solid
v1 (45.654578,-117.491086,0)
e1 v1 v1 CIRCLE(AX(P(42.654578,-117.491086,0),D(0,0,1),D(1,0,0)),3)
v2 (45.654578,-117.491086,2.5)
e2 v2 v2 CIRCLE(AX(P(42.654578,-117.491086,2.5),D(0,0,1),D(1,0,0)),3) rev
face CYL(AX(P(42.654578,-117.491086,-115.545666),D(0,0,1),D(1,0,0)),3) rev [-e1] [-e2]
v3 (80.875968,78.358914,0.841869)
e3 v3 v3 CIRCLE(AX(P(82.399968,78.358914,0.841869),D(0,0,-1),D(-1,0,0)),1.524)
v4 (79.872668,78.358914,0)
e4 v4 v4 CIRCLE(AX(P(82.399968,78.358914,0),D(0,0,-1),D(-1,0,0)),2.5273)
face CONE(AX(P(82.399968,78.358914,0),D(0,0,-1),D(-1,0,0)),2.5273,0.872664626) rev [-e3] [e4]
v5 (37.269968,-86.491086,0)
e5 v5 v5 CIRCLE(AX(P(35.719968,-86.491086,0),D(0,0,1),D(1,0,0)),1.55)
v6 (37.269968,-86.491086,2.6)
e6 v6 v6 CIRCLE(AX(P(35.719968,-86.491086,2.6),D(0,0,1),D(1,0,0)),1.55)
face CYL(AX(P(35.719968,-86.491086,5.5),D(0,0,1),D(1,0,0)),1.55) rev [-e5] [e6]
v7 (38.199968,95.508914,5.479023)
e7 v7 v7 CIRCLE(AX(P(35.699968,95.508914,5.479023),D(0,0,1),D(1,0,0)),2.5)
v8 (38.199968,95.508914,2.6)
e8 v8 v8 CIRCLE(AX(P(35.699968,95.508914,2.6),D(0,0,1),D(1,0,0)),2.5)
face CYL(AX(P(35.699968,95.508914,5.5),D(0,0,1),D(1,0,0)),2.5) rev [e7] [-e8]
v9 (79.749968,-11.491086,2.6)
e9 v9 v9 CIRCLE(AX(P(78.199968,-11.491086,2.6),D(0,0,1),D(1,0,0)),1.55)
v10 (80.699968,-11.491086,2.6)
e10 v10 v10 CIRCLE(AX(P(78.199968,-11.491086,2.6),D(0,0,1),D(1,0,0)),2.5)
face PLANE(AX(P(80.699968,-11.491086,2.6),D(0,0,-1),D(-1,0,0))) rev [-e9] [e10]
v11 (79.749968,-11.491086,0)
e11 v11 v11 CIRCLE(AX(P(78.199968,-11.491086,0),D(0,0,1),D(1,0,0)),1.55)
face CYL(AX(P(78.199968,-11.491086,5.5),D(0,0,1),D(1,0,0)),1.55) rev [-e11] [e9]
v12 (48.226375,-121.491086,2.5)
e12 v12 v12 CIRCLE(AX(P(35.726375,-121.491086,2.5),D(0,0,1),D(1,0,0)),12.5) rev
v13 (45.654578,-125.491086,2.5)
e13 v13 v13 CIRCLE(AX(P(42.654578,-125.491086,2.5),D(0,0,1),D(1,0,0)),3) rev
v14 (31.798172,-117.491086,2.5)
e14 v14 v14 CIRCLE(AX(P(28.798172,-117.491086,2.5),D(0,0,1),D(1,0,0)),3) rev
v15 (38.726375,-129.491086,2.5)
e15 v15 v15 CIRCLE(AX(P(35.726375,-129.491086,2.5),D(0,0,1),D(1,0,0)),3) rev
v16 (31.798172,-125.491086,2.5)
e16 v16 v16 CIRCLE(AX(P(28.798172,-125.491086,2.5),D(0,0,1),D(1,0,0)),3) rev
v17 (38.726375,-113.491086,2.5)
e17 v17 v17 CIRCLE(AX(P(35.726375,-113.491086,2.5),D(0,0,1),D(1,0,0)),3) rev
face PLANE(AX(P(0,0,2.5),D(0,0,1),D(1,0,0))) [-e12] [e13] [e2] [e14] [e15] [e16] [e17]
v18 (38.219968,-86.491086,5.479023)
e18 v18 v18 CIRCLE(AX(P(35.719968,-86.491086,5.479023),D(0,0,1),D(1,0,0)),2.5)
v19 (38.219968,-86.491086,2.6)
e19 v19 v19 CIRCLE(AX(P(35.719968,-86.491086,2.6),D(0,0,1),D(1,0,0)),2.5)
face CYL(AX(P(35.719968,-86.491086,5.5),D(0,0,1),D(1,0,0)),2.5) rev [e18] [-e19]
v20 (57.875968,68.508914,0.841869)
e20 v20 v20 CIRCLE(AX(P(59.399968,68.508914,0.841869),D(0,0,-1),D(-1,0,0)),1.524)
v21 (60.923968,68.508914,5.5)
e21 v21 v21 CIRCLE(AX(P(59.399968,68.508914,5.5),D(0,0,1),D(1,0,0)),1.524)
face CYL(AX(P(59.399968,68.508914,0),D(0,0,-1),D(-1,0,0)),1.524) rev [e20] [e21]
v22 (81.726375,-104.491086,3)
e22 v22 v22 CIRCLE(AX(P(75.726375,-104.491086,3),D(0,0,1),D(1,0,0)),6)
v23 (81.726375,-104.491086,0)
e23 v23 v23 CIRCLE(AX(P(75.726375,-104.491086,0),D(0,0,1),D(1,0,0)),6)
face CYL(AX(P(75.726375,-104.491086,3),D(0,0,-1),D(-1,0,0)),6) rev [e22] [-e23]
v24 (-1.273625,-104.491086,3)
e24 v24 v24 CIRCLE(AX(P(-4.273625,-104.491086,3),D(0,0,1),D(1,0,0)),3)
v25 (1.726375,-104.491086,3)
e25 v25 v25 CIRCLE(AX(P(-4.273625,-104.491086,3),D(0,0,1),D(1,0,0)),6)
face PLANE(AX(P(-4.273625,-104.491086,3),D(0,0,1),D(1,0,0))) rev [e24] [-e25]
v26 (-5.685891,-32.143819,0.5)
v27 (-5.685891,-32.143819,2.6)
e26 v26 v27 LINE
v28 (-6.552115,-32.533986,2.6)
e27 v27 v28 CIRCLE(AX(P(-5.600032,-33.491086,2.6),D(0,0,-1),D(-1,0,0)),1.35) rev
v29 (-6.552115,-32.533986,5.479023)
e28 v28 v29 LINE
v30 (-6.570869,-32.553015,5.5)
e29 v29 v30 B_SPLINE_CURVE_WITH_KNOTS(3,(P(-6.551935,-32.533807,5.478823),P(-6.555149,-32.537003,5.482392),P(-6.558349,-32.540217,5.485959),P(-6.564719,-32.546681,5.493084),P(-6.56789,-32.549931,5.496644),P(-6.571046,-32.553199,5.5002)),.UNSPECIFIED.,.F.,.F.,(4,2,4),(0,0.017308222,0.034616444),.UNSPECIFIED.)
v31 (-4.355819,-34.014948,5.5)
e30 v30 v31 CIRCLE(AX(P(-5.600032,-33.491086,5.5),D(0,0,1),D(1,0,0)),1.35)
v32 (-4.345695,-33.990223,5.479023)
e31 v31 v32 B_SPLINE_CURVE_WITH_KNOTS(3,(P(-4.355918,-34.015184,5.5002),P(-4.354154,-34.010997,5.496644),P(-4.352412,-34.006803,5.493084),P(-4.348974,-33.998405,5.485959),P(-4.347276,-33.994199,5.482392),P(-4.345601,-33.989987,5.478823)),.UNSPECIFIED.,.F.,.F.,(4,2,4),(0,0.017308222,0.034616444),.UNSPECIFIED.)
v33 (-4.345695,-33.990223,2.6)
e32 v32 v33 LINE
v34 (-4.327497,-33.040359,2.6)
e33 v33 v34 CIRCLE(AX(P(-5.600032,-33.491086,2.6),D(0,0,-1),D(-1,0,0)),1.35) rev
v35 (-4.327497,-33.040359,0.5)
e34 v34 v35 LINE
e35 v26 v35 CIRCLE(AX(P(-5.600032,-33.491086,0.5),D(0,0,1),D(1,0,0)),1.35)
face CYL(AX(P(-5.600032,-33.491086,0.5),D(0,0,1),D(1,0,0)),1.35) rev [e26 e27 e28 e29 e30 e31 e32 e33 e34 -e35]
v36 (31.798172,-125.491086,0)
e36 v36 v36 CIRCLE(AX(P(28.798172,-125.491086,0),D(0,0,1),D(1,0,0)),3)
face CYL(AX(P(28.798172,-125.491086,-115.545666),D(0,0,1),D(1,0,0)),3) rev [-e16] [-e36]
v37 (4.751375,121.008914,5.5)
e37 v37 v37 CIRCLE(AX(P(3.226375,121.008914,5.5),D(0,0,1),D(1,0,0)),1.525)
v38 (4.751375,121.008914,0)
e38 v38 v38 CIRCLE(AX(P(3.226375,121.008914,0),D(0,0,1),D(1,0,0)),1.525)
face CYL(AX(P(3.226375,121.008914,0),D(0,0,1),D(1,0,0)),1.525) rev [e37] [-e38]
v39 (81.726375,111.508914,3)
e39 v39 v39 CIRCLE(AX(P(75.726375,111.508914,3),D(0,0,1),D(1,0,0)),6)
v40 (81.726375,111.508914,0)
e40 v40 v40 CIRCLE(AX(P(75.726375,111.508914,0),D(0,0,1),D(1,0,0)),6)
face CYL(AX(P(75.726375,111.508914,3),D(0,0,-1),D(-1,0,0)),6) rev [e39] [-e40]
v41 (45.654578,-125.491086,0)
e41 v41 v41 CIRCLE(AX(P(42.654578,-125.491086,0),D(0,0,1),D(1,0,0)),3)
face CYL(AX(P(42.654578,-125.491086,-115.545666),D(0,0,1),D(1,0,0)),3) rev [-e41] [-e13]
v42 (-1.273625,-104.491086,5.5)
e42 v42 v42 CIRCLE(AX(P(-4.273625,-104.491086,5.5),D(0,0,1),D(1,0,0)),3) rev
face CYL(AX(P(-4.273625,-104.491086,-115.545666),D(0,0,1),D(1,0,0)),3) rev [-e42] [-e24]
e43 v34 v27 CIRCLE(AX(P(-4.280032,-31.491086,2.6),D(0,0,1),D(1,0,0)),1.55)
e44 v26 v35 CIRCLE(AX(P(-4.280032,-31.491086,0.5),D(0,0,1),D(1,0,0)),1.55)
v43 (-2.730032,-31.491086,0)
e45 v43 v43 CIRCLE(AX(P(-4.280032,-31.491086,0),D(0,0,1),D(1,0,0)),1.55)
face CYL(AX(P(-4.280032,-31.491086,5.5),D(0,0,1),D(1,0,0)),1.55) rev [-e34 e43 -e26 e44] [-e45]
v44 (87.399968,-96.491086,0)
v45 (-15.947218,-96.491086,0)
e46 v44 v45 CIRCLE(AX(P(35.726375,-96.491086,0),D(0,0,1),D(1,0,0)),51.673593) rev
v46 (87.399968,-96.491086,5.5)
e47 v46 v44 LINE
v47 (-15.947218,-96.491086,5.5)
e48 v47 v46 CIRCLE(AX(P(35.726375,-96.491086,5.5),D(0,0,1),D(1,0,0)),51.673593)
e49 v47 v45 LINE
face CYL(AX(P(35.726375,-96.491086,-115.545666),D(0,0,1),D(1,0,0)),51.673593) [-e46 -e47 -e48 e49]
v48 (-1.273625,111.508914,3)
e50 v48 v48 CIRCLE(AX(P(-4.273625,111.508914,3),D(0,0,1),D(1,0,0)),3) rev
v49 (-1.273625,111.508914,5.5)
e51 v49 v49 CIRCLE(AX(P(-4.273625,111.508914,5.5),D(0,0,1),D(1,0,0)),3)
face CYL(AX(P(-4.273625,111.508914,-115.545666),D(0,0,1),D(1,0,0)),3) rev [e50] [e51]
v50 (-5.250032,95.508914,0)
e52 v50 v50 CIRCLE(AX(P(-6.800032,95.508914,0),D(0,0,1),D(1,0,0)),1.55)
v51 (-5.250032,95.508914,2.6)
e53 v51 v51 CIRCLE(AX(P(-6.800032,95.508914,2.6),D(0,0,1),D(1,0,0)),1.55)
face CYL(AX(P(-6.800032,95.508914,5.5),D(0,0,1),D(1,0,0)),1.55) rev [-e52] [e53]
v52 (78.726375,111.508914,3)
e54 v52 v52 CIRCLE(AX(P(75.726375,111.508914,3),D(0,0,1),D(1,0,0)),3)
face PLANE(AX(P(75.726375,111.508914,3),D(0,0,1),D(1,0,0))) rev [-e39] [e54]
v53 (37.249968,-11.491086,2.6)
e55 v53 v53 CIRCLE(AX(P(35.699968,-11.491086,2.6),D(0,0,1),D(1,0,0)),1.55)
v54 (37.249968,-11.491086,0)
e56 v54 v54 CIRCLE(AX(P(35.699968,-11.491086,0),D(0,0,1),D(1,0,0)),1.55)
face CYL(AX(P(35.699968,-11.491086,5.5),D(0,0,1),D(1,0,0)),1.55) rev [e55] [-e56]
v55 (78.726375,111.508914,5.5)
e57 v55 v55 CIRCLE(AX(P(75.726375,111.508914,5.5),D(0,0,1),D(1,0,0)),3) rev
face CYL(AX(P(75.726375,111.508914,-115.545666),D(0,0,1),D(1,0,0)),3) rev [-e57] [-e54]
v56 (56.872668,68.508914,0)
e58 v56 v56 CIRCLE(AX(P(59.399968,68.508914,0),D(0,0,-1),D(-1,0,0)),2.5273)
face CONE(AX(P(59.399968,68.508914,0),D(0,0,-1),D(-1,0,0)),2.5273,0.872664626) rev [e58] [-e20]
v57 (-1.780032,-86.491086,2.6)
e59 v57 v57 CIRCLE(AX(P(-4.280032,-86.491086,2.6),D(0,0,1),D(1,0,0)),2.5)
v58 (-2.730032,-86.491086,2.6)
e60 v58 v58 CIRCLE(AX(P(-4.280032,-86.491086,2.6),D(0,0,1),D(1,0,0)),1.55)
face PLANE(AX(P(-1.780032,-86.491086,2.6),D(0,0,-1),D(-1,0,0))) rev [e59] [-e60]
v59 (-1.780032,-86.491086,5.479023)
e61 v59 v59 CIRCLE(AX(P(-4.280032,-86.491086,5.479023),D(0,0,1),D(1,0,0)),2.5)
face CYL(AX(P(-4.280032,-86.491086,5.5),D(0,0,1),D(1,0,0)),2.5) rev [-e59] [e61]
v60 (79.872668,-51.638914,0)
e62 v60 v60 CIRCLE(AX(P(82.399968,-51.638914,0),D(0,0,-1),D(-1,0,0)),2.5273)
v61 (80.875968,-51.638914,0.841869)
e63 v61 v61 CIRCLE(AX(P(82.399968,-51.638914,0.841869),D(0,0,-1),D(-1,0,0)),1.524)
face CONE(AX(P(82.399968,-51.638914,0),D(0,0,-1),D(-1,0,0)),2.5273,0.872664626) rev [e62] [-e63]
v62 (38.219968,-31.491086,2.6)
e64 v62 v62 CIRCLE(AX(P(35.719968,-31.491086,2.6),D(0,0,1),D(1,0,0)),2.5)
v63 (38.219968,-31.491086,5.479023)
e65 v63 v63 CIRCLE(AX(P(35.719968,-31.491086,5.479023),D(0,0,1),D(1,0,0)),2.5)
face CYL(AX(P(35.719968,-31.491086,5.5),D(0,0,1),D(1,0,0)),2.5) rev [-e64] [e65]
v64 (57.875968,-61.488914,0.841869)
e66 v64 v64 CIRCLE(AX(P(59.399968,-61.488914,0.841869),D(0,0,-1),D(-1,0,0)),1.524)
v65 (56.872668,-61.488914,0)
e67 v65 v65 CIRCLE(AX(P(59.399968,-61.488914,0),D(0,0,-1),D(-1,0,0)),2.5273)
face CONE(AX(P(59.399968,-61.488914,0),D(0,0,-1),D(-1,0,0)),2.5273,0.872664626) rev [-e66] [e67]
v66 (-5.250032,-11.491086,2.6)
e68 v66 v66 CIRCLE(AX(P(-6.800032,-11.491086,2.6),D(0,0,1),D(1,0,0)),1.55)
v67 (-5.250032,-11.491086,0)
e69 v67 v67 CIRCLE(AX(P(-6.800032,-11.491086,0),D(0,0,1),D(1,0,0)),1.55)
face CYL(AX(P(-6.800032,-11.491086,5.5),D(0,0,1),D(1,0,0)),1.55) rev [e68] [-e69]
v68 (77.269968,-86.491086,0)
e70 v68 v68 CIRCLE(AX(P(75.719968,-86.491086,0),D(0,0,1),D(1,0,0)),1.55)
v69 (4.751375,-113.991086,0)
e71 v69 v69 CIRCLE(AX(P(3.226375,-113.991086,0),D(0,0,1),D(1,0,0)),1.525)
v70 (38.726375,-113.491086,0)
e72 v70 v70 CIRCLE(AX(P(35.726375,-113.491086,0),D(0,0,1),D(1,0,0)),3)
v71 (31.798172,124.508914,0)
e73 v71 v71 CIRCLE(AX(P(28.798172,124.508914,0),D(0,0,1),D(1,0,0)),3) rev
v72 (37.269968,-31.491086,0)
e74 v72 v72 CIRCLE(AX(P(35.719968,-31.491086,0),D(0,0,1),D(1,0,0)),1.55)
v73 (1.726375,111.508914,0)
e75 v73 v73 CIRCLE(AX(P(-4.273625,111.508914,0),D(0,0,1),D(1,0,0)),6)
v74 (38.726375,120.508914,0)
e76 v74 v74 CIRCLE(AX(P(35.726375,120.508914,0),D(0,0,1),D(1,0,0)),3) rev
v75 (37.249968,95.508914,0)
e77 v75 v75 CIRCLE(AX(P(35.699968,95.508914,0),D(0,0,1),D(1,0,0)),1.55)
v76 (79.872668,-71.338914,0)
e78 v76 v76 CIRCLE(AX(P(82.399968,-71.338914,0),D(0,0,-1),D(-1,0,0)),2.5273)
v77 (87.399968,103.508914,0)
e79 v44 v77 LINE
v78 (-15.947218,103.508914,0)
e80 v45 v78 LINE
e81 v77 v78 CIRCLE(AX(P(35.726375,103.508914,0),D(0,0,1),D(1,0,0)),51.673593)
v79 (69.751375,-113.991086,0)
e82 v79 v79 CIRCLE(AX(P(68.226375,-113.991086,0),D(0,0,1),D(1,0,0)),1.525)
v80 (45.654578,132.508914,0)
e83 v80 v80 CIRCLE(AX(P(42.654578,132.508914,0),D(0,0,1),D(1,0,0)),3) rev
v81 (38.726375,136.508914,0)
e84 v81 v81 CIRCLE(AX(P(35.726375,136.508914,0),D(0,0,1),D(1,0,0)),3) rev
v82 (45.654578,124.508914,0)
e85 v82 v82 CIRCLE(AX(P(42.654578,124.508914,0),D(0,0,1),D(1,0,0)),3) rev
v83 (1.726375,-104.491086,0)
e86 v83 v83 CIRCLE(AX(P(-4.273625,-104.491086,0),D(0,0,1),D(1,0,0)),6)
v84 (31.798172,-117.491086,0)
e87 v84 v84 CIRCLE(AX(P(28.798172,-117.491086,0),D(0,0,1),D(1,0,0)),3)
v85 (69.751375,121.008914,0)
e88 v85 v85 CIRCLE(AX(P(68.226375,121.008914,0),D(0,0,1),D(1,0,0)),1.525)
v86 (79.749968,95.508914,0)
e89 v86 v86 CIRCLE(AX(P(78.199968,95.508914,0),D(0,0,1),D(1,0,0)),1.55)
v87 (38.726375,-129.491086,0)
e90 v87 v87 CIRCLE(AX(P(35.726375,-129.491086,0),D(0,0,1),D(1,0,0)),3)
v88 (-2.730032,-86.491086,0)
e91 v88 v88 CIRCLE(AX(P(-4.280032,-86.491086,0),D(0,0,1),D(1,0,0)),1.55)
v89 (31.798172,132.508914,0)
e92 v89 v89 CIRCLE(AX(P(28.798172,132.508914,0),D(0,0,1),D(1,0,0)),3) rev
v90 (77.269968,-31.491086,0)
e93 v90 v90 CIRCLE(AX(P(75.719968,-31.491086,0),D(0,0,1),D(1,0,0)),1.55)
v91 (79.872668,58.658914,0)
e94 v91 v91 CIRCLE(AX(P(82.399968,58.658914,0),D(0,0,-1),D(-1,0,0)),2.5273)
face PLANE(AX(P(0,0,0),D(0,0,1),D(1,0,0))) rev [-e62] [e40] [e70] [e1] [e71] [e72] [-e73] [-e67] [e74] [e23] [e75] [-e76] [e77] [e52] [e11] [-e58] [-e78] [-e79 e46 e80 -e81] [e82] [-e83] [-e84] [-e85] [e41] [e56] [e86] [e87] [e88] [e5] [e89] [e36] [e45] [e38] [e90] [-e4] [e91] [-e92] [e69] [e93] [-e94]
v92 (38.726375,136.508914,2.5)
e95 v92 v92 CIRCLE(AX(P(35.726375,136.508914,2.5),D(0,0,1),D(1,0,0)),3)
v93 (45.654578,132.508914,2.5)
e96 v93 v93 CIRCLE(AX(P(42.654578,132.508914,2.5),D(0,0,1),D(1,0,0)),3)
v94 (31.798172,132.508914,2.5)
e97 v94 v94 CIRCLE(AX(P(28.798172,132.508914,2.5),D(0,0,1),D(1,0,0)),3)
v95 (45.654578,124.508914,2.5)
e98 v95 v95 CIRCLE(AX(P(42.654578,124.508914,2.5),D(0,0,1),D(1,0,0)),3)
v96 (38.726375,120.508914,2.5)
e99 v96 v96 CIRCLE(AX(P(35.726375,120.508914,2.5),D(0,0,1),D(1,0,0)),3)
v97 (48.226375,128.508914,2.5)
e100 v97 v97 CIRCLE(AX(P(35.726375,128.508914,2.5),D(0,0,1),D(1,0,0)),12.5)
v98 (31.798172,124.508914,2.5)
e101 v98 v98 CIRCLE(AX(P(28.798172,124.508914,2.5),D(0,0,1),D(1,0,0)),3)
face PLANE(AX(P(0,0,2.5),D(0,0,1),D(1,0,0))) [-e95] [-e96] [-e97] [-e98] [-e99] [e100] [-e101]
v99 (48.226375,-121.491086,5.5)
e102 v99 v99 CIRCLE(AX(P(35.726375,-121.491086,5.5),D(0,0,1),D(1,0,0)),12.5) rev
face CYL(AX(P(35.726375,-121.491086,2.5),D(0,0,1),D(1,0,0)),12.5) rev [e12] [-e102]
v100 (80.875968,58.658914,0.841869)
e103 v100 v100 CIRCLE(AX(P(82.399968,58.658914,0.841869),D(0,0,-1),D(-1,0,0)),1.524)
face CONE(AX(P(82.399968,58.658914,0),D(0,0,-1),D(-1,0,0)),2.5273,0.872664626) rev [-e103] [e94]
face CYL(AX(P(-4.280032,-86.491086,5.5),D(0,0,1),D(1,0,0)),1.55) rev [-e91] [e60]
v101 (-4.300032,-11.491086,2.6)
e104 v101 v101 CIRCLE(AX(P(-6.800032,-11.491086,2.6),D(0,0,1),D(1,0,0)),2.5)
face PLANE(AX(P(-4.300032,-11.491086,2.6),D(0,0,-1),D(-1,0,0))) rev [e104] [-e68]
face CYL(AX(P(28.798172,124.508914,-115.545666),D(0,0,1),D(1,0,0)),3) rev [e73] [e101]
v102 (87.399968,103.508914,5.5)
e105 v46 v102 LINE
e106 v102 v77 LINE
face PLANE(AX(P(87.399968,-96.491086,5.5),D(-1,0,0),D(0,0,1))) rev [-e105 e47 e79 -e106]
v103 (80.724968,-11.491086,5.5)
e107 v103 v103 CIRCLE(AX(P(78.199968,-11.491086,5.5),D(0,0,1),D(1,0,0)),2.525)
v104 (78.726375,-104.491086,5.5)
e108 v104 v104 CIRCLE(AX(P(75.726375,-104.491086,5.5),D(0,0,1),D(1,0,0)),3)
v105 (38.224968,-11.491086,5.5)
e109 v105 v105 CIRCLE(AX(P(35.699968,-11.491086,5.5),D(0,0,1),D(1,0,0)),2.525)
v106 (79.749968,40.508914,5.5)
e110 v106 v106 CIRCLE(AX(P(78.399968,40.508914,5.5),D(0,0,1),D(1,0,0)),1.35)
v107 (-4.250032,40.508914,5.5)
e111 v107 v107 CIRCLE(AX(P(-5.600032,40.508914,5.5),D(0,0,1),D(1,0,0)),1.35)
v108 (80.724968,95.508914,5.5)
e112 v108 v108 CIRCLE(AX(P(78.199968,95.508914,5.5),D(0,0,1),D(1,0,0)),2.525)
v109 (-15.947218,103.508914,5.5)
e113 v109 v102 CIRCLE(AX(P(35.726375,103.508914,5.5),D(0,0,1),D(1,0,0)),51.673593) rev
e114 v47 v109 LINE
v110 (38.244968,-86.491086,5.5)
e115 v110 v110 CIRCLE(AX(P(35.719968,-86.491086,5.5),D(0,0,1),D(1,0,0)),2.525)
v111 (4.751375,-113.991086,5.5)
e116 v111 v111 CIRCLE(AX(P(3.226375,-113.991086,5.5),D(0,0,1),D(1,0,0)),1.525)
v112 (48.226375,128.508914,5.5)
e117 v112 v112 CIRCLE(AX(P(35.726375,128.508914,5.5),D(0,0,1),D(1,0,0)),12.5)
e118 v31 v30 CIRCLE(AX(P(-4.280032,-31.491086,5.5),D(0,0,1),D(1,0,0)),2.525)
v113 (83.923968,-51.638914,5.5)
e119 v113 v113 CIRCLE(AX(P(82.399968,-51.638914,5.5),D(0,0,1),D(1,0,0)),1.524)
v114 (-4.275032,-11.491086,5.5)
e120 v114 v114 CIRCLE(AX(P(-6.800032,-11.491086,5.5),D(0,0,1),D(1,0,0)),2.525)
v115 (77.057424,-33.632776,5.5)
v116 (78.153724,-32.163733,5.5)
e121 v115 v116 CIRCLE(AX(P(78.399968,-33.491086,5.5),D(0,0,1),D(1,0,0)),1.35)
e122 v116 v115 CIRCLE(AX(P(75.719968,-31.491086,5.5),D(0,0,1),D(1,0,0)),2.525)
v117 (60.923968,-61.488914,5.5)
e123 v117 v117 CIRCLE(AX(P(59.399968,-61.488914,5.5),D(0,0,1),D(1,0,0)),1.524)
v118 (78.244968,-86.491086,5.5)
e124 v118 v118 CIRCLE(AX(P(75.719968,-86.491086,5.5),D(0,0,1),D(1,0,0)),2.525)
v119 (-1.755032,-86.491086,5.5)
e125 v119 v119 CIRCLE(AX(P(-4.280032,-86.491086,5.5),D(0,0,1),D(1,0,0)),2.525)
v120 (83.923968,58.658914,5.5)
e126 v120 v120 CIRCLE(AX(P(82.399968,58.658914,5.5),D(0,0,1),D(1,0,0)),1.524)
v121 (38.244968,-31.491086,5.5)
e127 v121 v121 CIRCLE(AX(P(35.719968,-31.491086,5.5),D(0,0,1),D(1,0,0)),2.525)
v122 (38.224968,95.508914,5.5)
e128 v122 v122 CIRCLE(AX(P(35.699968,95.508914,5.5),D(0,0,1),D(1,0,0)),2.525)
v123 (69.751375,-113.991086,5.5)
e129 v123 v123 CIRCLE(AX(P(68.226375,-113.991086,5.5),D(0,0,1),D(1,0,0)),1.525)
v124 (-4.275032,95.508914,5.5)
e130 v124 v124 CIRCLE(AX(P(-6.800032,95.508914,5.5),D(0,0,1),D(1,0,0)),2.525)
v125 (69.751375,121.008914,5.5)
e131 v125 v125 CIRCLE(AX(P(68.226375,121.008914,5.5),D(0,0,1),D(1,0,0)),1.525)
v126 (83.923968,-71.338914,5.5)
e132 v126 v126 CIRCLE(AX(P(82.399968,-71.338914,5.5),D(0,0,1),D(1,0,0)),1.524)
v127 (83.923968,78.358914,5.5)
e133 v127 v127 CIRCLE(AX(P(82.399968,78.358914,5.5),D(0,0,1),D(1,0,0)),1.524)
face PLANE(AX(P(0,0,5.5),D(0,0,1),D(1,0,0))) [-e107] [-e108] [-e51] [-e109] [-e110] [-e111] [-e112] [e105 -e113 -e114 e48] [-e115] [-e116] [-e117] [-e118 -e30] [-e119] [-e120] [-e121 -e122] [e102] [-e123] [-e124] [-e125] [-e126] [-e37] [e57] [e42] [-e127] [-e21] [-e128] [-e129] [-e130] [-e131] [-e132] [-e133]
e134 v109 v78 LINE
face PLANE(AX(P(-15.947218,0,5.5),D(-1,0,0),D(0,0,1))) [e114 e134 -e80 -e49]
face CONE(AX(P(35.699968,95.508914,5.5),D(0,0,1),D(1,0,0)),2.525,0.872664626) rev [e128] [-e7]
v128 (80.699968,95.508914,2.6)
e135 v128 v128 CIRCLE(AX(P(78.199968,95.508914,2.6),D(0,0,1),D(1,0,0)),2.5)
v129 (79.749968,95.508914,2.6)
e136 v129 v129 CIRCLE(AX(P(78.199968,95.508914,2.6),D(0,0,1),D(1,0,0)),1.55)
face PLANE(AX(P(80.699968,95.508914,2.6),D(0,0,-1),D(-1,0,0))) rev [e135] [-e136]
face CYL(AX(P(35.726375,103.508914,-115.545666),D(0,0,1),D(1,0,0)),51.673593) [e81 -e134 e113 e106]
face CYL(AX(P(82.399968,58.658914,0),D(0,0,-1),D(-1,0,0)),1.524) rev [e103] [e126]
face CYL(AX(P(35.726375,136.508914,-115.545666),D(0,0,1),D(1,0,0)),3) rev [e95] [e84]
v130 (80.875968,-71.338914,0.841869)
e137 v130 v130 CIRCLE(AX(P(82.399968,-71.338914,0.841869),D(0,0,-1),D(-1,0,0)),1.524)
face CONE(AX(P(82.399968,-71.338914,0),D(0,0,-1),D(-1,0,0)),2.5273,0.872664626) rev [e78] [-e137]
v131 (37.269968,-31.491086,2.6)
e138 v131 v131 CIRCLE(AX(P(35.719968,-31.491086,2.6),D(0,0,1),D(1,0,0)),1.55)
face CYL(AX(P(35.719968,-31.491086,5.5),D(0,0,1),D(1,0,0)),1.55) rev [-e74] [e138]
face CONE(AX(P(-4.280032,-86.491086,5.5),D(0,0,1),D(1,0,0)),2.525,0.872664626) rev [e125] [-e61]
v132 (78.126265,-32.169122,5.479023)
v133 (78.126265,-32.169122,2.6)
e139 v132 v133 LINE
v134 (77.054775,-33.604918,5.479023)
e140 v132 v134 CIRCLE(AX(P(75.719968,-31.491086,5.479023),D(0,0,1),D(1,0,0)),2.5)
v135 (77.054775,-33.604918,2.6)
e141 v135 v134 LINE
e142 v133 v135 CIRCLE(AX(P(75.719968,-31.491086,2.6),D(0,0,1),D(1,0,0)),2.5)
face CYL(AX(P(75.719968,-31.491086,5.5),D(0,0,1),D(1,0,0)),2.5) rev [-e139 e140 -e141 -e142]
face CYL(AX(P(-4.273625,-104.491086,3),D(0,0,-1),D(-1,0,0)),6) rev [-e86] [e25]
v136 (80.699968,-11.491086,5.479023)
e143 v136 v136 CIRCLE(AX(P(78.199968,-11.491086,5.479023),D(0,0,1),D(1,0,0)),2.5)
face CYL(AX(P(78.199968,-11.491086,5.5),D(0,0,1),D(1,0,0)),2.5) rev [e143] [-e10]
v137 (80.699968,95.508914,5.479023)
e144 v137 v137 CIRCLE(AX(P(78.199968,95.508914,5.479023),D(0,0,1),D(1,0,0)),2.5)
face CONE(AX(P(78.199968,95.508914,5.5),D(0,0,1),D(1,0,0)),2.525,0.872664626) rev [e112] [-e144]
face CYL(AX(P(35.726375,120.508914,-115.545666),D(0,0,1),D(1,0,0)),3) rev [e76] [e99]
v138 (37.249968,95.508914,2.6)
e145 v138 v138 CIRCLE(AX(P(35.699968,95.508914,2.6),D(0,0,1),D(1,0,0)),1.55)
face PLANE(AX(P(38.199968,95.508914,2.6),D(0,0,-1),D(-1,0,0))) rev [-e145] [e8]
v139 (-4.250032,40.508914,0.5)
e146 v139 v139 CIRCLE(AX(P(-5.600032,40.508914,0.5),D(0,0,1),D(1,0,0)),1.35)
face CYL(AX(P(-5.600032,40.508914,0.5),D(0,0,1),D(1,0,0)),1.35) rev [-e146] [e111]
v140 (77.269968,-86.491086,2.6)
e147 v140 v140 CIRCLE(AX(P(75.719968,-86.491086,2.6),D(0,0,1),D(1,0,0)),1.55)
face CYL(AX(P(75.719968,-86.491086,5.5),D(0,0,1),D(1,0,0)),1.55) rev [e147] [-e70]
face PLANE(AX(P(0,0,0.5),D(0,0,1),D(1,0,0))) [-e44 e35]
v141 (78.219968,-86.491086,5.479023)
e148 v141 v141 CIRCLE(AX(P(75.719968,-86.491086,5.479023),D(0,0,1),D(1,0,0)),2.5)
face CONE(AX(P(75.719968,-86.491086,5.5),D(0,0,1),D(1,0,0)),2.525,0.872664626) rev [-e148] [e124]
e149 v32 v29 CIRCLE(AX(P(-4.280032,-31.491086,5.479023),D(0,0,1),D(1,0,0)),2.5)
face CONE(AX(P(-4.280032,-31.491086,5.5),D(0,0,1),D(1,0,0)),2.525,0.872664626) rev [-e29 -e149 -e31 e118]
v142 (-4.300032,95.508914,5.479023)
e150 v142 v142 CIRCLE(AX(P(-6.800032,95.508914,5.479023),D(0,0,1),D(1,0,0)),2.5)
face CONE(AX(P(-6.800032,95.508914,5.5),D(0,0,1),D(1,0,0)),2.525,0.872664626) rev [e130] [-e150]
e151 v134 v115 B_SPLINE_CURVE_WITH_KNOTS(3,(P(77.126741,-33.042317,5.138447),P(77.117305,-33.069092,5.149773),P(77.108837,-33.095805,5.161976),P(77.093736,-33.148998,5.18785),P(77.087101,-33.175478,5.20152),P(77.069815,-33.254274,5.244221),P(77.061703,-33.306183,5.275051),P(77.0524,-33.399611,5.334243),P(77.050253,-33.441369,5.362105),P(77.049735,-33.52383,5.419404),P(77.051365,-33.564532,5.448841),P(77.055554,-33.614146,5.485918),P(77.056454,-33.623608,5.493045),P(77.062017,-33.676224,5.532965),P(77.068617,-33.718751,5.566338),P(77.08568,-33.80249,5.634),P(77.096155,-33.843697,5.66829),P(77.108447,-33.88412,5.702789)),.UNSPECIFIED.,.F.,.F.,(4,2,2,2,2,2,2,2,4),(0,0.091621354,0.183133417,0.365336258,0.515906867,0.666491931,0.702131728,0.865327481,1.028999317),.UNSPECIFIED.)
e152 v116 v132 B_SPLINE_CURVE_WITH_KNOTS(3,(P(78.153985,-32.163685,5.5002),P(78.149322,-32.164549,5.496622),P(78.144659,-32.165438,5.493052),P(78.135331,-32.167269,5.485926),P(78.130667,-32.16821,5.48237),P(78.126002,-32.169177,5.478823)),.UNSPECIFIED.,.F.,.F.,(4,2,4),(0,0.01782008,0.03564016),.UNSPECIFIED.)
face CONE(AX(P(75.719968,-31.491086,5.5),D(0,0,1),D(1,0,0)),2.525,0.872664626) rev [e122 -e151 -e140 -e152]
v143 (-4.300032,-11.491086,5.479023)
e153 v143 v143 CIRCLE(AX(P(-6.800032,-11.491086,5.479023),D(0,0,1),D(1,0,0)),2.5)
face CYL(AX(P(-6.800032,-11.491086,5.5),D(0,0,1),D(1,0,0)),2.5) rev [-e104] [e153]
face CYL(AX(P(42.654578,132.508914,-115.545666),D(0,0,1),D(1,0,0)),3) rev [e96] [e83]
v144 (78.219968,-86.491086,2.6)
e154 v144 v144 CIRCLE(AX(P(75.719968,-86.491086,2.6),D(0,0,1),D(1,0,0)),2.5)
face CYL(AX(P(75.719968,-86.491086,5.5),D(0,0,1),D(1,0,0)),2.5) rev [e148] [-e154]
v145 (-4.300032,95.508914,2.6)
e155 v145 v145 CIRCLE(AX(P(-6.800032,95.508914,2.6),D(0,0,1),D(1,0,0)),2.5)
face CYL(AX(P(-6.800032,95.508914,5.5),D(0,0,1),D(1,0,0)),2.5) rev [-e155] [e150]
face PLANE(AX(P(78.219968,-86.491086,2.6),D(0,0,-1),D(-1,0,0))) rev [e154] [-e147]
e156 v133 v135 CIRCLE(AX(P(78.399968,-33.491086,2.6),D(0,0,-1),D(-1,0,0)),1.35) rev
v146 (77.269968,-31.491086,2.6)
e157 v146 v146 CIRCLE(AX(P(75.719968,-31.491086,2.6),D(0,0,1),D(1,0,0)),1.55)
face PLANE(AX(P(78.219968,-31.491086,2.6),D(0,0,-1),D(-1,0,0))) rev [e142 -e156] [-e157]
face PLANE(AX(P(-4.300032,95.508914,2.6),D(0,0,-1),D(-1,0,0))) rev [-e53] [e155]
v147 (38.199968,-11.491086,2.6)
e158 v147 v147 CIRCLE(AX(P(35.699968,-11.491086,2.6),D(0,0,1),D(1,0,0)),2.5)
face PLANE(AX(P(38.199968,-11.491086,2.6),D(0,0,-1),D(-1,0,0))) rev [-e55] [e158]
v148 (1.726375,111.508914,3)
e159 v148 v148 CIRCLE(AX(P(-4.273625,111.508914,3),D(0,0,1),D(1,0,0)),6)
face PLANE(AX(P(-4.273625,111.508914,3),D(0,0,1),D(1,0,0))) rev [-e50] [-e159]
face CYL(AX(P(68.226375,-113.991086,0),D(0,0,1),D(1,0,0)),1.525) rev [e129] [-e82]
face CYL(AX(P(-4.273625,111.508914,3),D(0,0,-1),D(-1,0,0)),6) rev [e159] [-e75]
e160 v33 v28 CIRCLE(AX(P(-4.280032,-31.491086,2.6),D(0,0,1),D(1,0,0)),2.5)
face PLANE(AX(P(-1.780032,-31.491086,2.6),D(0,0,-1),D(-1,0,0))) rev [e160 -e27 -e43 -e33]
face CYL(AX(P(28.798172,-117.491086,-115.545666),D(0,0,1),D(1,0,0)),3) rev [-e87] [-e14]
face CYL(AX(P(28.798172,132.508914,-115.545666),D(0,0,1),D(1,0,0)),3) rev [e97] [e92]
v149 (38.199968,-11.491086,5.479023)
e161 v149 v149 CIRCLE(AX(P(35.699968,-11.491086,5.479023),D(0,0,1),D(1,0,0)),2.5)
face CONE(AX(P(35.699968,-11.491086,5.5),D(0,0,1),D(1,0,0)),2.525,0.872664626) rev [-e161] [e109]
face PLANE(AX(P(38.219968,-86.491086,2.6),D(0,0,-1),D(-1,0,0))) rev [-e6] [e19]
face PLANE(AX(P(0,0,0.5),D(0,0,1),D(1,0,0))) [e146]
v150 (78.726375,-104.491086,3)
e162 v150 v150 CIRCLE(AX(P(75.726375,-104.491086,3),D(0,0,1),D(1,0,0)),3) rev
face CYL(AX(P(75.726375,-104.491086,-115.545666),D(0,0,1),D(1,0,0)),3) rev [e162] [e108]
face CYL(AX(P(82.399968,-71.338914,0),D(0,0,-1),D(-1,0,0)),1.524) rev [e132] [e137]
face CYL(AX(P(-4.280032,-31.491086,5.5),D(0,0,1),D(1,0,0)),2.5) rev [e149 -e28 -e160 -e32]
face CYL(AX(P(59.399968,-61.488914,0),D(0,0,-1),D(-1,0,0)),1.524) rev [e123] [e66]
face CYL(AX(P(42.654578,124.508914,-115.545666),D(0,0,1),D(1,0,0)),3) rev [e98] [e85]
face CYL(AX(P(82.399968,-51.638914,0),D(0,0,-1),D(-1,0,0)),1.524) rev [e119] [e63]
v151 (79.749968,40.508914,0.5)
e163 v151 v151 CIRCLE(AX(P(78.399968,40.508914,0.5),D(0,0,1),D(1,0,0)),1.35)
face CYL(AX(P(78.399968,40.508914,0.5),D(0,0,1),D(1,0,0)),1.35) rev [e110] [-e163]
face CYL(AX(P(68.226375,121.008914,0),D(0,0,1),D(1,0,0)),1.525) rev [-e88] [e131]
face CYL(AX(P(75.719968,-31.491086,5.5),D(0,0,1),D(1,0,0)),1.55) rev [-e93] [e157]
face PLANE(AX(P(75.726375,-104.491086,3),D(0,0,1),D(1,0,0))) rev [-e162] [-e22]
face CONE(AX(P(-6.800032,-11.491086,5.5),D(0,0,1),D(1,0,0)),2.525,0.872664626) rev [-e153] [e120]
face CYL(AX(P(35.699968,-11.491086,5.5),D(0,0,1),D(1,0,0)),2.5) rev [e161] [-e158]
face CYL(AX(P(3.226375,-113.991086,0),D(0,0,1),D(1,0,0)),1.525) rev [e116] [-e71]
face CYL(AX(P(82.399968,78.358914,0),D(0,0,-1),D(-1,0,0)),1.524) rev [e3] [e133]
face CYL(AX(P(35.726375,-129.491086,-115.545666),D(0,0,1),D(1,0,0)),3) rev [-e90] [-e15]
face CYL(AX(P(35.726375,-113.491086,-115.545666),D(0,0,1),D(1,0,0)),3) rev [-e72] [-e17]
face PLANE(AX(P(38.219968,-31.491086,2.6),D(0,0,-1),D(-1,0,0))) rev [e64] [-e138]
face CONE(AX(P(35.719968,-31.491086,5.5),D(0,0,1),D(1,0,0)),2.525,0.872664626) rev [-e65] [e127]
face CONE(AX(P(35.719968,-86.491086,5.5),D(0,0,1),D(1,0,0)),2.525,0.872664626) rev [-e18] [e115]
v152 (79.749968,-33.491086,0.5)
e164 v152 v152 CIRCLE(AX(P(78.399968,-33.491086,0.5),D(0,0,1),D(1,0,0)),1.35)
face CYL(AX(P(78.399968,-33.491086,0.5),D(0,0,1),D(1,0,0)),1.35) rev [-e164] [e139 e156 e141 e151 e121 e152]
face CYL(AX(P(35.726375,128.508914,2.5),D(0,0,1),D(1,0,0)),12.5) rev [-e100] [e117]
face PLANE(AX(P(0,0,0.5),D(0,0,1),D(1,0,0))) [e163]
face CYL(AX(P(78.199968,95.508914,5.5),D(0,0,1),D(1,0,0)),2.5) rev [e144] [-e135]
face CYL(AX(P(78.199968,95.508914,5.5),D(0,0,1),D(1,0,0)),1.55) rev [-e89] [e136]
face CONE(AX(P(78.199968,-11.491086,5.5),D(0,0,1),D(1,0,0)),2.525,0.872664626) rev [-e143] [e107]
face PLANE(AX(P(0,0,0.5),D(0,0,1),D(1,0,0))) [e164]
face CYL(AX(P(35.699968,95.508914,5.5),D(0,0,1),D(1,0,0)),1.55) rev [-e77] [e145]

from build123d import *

# Parameters (mm, degrees)
SKETCH_2_W                      = 103.347185053
SKETCH_2_H                      = 200
EXTRUDE_1_DEPTH                 = 5.5
EXTRUDE_START                   = -5.5
EXTRUDE_2_OUTLINE_R             = 3
EXTRUDE_2_DEPTH                 = 5.5
CUT_EXTRUDE_START               = -3
CUT_EXTRUDE_6_OUTLINE_R         = 12.5
CUT_EXTRUDE_6_OUTLINE_R_2       = 3
CUT_EXTRUDE_6_DEPTH             = 3
CUT_EXTRUDE3_START              = -5.5
CUT_EXTRUDE3_OUTLINE_R          = 6
CUT_EXTRUDE3_OUTLINE_R_2        = 3
CUT_EXTRUDE3_DEPTH              = 3
CUT_EXTRUDE_7_DEPTH             = 5
HOLE_WIZARD_3_100_2_D           = 3.048
HOLE_WIZARD_3_100_2_CSINK_D     = 5.0546
HOLE_WIZARD_3_100_2_CSINK_ANGLE = 100
HOLE_WIZARD_1_AT_2_COUNT        = 2
HOLE_WIZARD_1_AT_2_PITCH        = 42.5
HOLE_WIZARD_1_AT_3_COUNT        = 2
HOLE_WIZARD_1_AT_3_PITCH        = 85
HOLE_WIZARD_1_AT_4_COUNT        = 2
HOLE_WIZARD_1_AT_4_PITCH        = 107
HOLE_WIZARD_1_AT_5_COUNT        = 2
HOLE_WIZARD_1_AT_5_PITCH        = 115.131446616
HOLE_WIZARD_1_AT_6_COUNT        = 2
HOLE_WIZARD_1_AT_6_PITCH        = 136.65284483
HOLE_WIZARD_2_AT_2_COUNT        = 2
HOLE_WIZARD_2_AT_2_PITCH        = 40
HOLE_WIZARD_2_AT_3_COUNT        = 2
HOLE_WIZARD_2_AT_3_PITCH        = 55
HOLE_WIZARD_2_AT_4_COUNT        = 2
HOLE_WIZARD_2_AT_4_PITCH        = 68.007352544
HOLE_WIZARD_2_AT_5_COUNT        = 2
HOLE_WIZARD_2_AT_5_PITCH        = 97.082439195
HOLE_WIZARD_2_AT_6_COUNT        = 2
HOLE_WIZARD_2_AT_6_PITCH        = 80
SKETCH_15_R                     = 1.525
CUT_EXTRUDE_8_DEPTH             = 5.5


# Read off the part's stored shape, not the designer's step: 凸台-拉伸2, 切除-拉伸6, Cut-Extrude3
with BuildPart() as part:
    # 草图2 → 凸台-拉伸1 (new body)
    with BuildSketch(Plane.XY):
        with Locations((35.726375018, 3.508914385)):
            Rectangle(SKETCH_2_W, SKETCH_2_H)
    extrude(amount=EXTRUDE_1_DEPTH)

    # 凸台-拉伸2 outline → 凸台-拉伸2 (add)
    # profile 1 of 2: a face of its own
    with BuildSketch(Plane.XY.offset(5.5).offset(EXTRUDE_START)):
        with BuildLine():
            Line((-15.947217509, 103.508914385), (87.399967544, 103.508914385))
            ThreePointArc((87.399967544, 103.508914385), (35.726375017, 155.182506912), (-15.947217509, 103.508914385))
        make_face()
        with Locations((-4.273624983, 111.508914385)):
            Circle(EXTRUDE_2_OUTLINE_R, mode=Mode.SUBTRACT)
        with Locations((28.798171787, 124.508914385)):
            Circle(EXTRUDE_2_OUTLINE_R, mode=Mode.SUBTRACT)
        with Locations((28.798171787, 132.508914385)):
            Circle(EXTRUDE_2_OUTLINE_R, mode=Mode.SUBTRACT)
        with Locations((35.726375017, 120.508914385)):
            Circle(EXTRUDE_2_OUTLINE_R, mode=Mode.SUBTRACT)
        with Locations((35.726375017, 136.508914385)):
            Circle(EXTRUDE_2_OUTLINE_R, mode=Mode.SUBTRACT)
        with Locations((42.654578248, 124.508914385)):
            Circle(EXTRUDE_2_OUTLINE_R, mode=Mode.SUBTRACT)
        with Locations((42.654578248, 132.508914385)):
            Circle(EXTRUDE_2_OUTLINE_R, mode=Mode.SUBTRACT)
        with Locations((75.726375017, 111.508914385)):
            Circle(EXTRUDE_2_OUTLINE_R, mode=Mode.SUBTRACT)
    # profile 2 of 2: a face of its own
    with BuildSketch(Plane.XY.offset(5.5).offset(EXTRUDE_START)):
        with BuildLine():
            Line((87.399967544, -96.491085615), (-15.947217509, -96.491085615))
            ThreePointArc((-15.947217509, -96.491085615), (35.726375018, -148.164678141), (87.399967544, -96.491085615))
        make_face()
        with Locations((-4.273624983, -104.491085615)):
            Circle(EXTRUDE_2_OUTLINE_R, mode=Mode.SUBTRACT)
        with Locations((35.726375017, -129.491085615)):
            Circle(EXTRUDE_2_OUTLINE_R, mode=Mode.SUBTRACT)
        with Locations((28.798171787, -125.491085615)):
            Circle(EXTRUDE_2_OUTLINE_R, mode=Mode.SUBTRACT)
        with Locations((28.798171787, -117.491085615)):
            Circle(EXTRUDE_2_OUTLINE_R, mode=Mode.SUBTRACT)
        with Locations((35.726375017, -113.491085615)):
            Circle(EXTRUDE_2_OUTLINE_R, mode=Mode.SUBTRACT)
        with Locations((42.654578248, -125.491085615)):
            Circle(EXTRUDE_2_OUTLINE_R, mode=Mode.SUBTRACT)
        with Locations((42.654578248, -117.491085615)):
            Circle(EXTRUDE_2_OUTLINE_R, mode=Mode.SUBTRACT)
        with Locations((75.726375017, -104.491085615)):
            Circle(EXTRUDE_2_OUTLINE_R, mode=Mode.SUBTRACT)
    extrude(amount=EXTRUDE_2_DEPTH)

    # 切除-拉伸6 outline → 切除-拉伸6 (cut)
    # profile 1 of 2: a face of its own
    with BuildSketch(Plane.XY.offset(5.5).offset(CUT_EXTRUDE_START)):
        with Locations((35.726375017, -121.491085615)):
            Circle(CUT_EXTRUDE_6_OUTLINE_R)
        with Locations((28.798171787, -125.491085615)):
            Circle(CUT_EXTRUDE_6_OUTLINE_R_2, mode=Mode.SUBTRACT)
        with Locations((28.798171787, -117.491085615)):
            Circle(CUT_EXTRUDE_6_OUTLINE_R_2, mode=Mode.SUBTRACT)
        with Locations((35.726375017, -129.491085615)):
            Circle(CUT_EXTRUDE_6_OUTLINE_R_2, mode=Mode.SUBTRACT)
        with Locations((35.726375017, -113.491085615)):
            Circle(CUT_EXTRUDE_6_OUTLINE_R_2, mode=Mode.SUBTRACT)
        with Locations((42.654578248, -125.491085615)):
            Circle(CUT_EXTRUDE_6_OUTLINE_R_2, mode=Mode.SUBTRACT)
        with Locations((42.654578248, -117.491085615)):
            Circle(CUT_EXTRUDE_6_OUTLINE_R_2, mode=Mode.SUBTRACT)
    # profile 2 of 2: a face of its own
    with BuildSketch(Plane.XY.offset(5.5).offset(CUT_EXTRUDE_START)):
        with Locations((35.726375017, 128.508914385)):
            Circle(CUT_EXTRUDE_6_OUTLINE_R)
        with Locations((28.798171787, 124.508914385)):
            Circle(CUT_EXTRUDE_6_OUTLINE_R_2, mode=Mode.SUBTRACT)
        with Locations((28.798171787, 132.508914385)):
            Circle(CUT_EXTRUDE_6_OUTLINE_R_2, mode=Mode.SUBTRACT)
        with Locations((35.726375017, 120.508914385)):
            Circle(CUT_EXTRUDE_6_OUTLINE_R_2, mode=Mode.SUBTRACT)
        with Locations((35.726375017, 136.508914385)):
            Circle(CUT_EXTRUDE_6_OUTLINE_R_2, mode=Mode.SUBTRACT)
        with Locations((42.654578248, 124.508914385)):
            Circle(CUT_EXTRUDE_6_OUTLINE_R_2, mode=Mode.SUBTRACT)
        with Locations((42.654578248, 132.508914385)):
            Circle(CUT_EXTRUDE_6_OUTLINE_R_2, mode=Mode.SUBTRACT)
    extrude(amount=CUT_EXTRUDE_6_DEPTH, mode=Mode.SUBTRACT)

    # Cut-Extrude3 outline → Cut-Extrude3 (cut)
    # profile 1 of 4: a face of its own
    with BuildSketch(Plane.XY.offset(5.5).offset(CUT_EXTRUDE3_START)):
        with Locations((75.726375017, -104.491085615)):
            Circle(CUT_EXTRUDE3_OUTLINE_R)
        with Locations((75.726375017, -104.491085615)):
            Circle(CUT_EXTRUDE3_OUTLINE_R_2, mode=Mode.SUBTRACT)
    # profile 2 of 4: a face of its own
    with BuildSketch(Plane.XY.offset(5.5).offset(CUT_EXTRUDE3_START)):
        with Locations((-4.273624983, -104.491085615)):
            Circle(CUT_EXTRUDE3_OUTLINE_R)
        with Locations((-4.273624983, -104.491085615)):
            Circle(CUT_EXTRUDE3_OUTLINE_R_2, mode=Mode.SUBTRACT)
    # profile 3 of 4: a face of its own
    with BuildSketch(Plane.XY.offset(5.5).offset(CUT_EXTRUDE3_START)):
        with Locations((75.726375017, 111.508914385)):
            Circle(CUT_EXTRUDE3_OUTLINE_R)
        with Locations((75.726375017, 111.508914385)):
            Circle(CUT_EXTRUDE3_OUTLINE_R_2, mode=Mode.SUBTRACT)
    # profile 4 of 4: a face of its own
    with BuildSketch(Plane.XY.offset(5.5).offset(CUT_EXTRUDE3_START)):
        with Locations((-4.273624983, 111.508914385)):
            Circle(CUT_EXTRUDE3_OUTLINE_R)
        with Locations((-4.273624983, 111.508914385)):
            Circle(CUT_EXTRUDE3_OUTLINE_R_2, mode=Mode.SUBTRACT)
    extrude(amount=CUT_EXTRUDE3_DEPTH, mode=Mode.SUBTRACT)

    # 草图5 → 切除-拉伸7 (cut)
    with BuildSketch(Plane.XY.offset(5.5)):
        with BuildLine():
            ThreePointArc((79.749967544, 40.508914385), (78.399967544, 41.858914385), (77.049967544, 40.508914385))
            Line((77.049967544, 40.508914385), (78.399967544, 40.508914385))
            Line((78.399967544, 40.508914385), (78.399967544, 39.158914385))
            ThreePointArc((78.399967544, 39.158914385), (79.354561699, 39.554320231), (79.749967544, 40.508914385))
        make_face()
        with BuildLine():
            Line((78.399967544, 40.508914385), (77.049967544, 40.508914385))
            ThreePointArc((77.049967544, 40.508914385), (77.44537339, 39.554320231), (78.399967544, 39.158914385))
            Line((78.399967544, 39.158914385), (78.399967544, 40.508914385))
        make_face()
        with BuildLine():
            ThreePointArc((79.749967544, -33.491085615), (79.354561699, -32.53649146), (78.399967544, -32.141085615))
            Line((78.399967544, -32.141085615), (78.399967544, -33.491085615))
            Line((78.399967544, -33.491085615), (77.049967544, -33.491085615))
            ThreePointArc((77.049967544, -33.491085615), (78.399967544, -34.841085615), (79.749967544, -33.491085615))
        make_face()
        with BuildLine():
            Line((78.399967544, -33.491085615), (78.399967544, -32.141085615))
            ThreePointArc((78.399967544, -32.141085615), (77.44537339, -32.53649146), (77.049967544, -33.491085615))
            Line((77.049967544, -33.491085615), (78.399967544, -33.491085615))
        make_face()
        with BuildLine():
            ThreePointArc((-4.250032456, -33.491085615), (-4.645438301, -32.53649146), (-5.600032456, -32.141085615))
            Line((-5.600032456, -32.141085615), (-5.600032456, -33.491085615))
            Line((-5.600032456, -33.491085615), (-4.250032456, -33.491085615))
        make_face()
        with BuildLine():
            Line((-5.600032456, -33.491085615), (-5.600032456, -32.141085615))
            ThreePointArc((-5.600032456, -32.141085615), (-6.55462661, -34.445679769), (-4.250032456, -33.491085615))
            Line((-4.250032456, -33.491085615), (-5.600032456, -33.491085615))
        make_face()
        with BuildLine():
            Line((-5.600032456, 39.158914385), (-5.600032456, 40.508914385))
            Line((-5.600032456, 40.508914385), (-4.250032456, 40.508914385))
            ThreePointArc((-4.250032456, 40.508914385), (-6.55462661, 41.46350854), (-5.600032456, 39.158914385))
        make_face()
        with BuildLine():
            Line((-4.250032456, 40.508914385), (-5.600032456, 40.508914385))
            Line((-5.600032456, 40.508914385), (-5.600032456, 39.158914385))
            ThreePointArc((-5.600032456, 39.158914385), (-4.645438301, 39.554320231), (-4.250032456, 40.508914385))
        make_face()
    extrude(amount=-CUT_EXTRUDE_7_DEPTH, mode=Mode.SUBTRACT)

    # #3 平头机械螺钉的锥形沉头孔 (100)2 (through all)
    with Locations(Plane(origin=(0, 0, 0), x_dir=(-1, 0, 0), z_dir=(0, 0, -1))):
        with Locations((-82.399967544, 78.358914385), (-59.399967544, 68.508914385), (-82.399967544, 58.658914385)):
            hole_wizard_3_100_2 = CounterSinkHole(HOLE_WIZARD_3_100_2_D / 2, HOLE_WIZARD_3_100_2_CSINK_D / 2, counter_sink_angle=HOLE_WIZARD_3_100_2_CSINK_ANGLE)

    # 镜向1: #3 平头机械螺钉的锥形沉头孔 (100)2 across plane
    add(hole_wizard_3_100_2.mirror(Plane.ZX.offset(3.51)), mode=Mode.SUBTRACT)

    # 草图12 → 打孔尺寸(%根据)内六角圆柱头螺钉的类型1 (revolve, cut)
    with BuildSketch(Plane(origin=(-6.800032456, 95.508914385, 5.5), x_dir=(0, -1, 0), z_dir=(1, 0, 0))):
        Polygon((0, 0), (0, 5.5), (1.55, 5.5), (1.55, 2.9), (2.5, 2.9), (2.5, 0.020977491), (2.525, 0), align=None)
    hole_wizard_1 = revolve(axis=Axis((-6.800032456, 95.508914385, 11.85), (0, 0, -1)), mode=Mode.SUBTRACT)

    # 打孔尺寸(%根据)内六角圆柱头螺钉的类型1 at 2: 打孔尺寸(%根据)内六角圆柱头螺钉的类型1 ×2
    with Locations(*[(i * HOLE_WIZARD_1_AT_2_PITCH, 0, 0) for i in range(1, HOLE_WIZARD_1_AT_2_COUNT)]):
        add(hole_wizard_1, mode=Mode.SUBTRACT)

    # 打孔尺寸(%根据)内六角圆柱头螺钉的类型1 at 3: 打孔尺寸(%根据)内六角圆柱头螺钉的类型1 ×2
    with Locations(*[(i * HOLE_WIZARD_1_AT_3_PITCH, 0, 0) for i in range(1, HOLE_WIZARD_1_AT_3_COUNT)]):
        add(hole_wizard_1, mode=Mode.SUBTRACT)

    # 打孔尺寸(%根据)内六角圆柱头螺钉的类型1 at 4: 打孔尺寸(%根据)内六角圆柱头螺钉的类型1 ×2
    with Locations(*[(0, -i * HOLE_WIZARD_1_AT_4_PITCH, 0) for i in range(1, HOLE_WIZARD_1_AT_4_COUNT)]):
        add(hole_wizard_1, mode=Mode.SUBTRACT)

    # 打孔尺寸(%根据)内六角圆柱头螺钉的类型1 at 5: 打孔尺寸(%根据)内六角圆柱头螺钉的类型1 ×2
    with Locations(*[Vector(0.3691432814318687, -0.9293724967814101, 0) * (i * HOLE_WIZARD_1_AT_5_PITCH) for i in range(1, HOLE_WIZARD_1_AT_5_COUNT)]):
        add(hole_wizard_1, mode=Mode.SUBTRACT)

    # 打孔尺寸(%根据)内六角圆柱头螺钉的类型1 at 6: 打孔尺寸(%根据)内六角圆柱头螺钉的类型1 ×2
    with Locations(*[Vector(0.6220141271558814, -0.7830060188903447, 0) * (i * HOLE_WIZARD_1_AT_6_PITCH) for i in range(1, HOLE_WIZARD_1_AT_6_COUNT)]):
        add(hole_wizard_1, mode=Mode.SUBTRACT)

    # 草图14 → 打孔尺寸(%根据)内六角圆柱头螺钉的类型2 (revolve, cut)
    with BuildSketch(Plane(origin=(-4.280032456, -31.491085615, 5.5), x_dir=(0, -1, 0), z_dir=(1, 0, 0))):
        Polygon((0, 0), (0, 5.5), (1.55, 5.5), (1.55, 2.9), (2.5, 2.9), (2.5, 0.020977491), (2.525, 0), align=None)
    hole_wizard_2 = revolve(axis=Axis((-4.280032456, -31.491085615, 11.85), (0, 0, -1)), mode=Mode.SUBTRACT)

    # 打孔尺寸(%根据)内六角圆柱头螺钉的类型2 at 2: 打孔尺寸(%根据)内六角圆柱头螺钉的类型2 ×2
    with Locations(*[(i * HOLE_WIZARD_2_AT_2_PITCH, 0, 0) for i in range(1, HOLE_WIZARD_2_AT_2_COUNT)]):
        add(hole_wizard_2, mode=Mode.SUBTRACT)

    # 打孔尺寸(%根据)内六角圆柱头螺钉的类型2 at 3: 打孔尺寸(%根据)内六角圆柱头螺钉的类型2 ×2
    with Locations(*[(0, -i * HOLE_WIZARD_2_AT_3_PITCH, 0) for i in range(1, HOLE_WIZARD_2_AT_3_COUNT)]):
        add(hole_wizard_2, mode=Mode.SUBTRACT)

    # 打孔尺寸(%根据)内六角圆柱头螺钉的类型2 at 4: 打孔尺寸(%根据)内六角圆柱头螺钉的类型2 ×2
    with Locations(*[Vector(0.5881716976750464, -0.8087360843031884, 0) * (i * HOLE_WIZARD_2_AT_4_PITCH) for i in range(1, HOLE_WIZARD_2_AT_4_COUNT)]):
        add(hole_wizard_2, mode=Mode.SUBTRACT)

    # 打孔尺寸(%根据)内六角圆柱头螺钉的类型2 at 5: 打孔尺寸(%根据)内六角圆柱头螺钉的类型2 ×2
    with Locations(*[Vector(0.8240419241993677, -0.5665288228870651, 0) * (i * HOLE_WIZARD_2_AT_5_PITCH) for i in range(1, HOLE_WIZARD_2_AT_5_COUNT)]):
        add(hole_wizard_2, mode=Mode.SUBTRACT)

    # 打孔尺寸(%根据)内六角圆柱头螺钉的类型2 at 6: 打孔尺寸(%根据)内六角圆柱头螺钉的类型2 ×2
    with Locations(*[(i * HOLE_WIZARD_2_AT_6_PITCH, 0, 0) for i in range(1, HOLE_WIZARD_2_AT_6_COUNT)]):
        add(hole_wizard_2, mode=Mode.SUBTRACT)

    # 草图15 → 切除-拉伸8 (cut)
    with BuildSketch(Plane.XY.offset(5.5)):
        with Locations((3.226375017, 121.008914385)):
            Circle(SKETCH_15_R)
        with Locations((68.226375017, 121.008914385)):
            Circle(SKETCH_15_R)
        with Locations((68.226375017, -113.991085615)):
            Circle(SKETCH_15_R)
        with Locations((3.226375017, -113.991085615)):
            Circle(SKETCH_15_R)
    extrude(amount=-CUT_EXTRUDE_8_DEPTH, mode=Mode.SUBTRACT)


solid = part.part
